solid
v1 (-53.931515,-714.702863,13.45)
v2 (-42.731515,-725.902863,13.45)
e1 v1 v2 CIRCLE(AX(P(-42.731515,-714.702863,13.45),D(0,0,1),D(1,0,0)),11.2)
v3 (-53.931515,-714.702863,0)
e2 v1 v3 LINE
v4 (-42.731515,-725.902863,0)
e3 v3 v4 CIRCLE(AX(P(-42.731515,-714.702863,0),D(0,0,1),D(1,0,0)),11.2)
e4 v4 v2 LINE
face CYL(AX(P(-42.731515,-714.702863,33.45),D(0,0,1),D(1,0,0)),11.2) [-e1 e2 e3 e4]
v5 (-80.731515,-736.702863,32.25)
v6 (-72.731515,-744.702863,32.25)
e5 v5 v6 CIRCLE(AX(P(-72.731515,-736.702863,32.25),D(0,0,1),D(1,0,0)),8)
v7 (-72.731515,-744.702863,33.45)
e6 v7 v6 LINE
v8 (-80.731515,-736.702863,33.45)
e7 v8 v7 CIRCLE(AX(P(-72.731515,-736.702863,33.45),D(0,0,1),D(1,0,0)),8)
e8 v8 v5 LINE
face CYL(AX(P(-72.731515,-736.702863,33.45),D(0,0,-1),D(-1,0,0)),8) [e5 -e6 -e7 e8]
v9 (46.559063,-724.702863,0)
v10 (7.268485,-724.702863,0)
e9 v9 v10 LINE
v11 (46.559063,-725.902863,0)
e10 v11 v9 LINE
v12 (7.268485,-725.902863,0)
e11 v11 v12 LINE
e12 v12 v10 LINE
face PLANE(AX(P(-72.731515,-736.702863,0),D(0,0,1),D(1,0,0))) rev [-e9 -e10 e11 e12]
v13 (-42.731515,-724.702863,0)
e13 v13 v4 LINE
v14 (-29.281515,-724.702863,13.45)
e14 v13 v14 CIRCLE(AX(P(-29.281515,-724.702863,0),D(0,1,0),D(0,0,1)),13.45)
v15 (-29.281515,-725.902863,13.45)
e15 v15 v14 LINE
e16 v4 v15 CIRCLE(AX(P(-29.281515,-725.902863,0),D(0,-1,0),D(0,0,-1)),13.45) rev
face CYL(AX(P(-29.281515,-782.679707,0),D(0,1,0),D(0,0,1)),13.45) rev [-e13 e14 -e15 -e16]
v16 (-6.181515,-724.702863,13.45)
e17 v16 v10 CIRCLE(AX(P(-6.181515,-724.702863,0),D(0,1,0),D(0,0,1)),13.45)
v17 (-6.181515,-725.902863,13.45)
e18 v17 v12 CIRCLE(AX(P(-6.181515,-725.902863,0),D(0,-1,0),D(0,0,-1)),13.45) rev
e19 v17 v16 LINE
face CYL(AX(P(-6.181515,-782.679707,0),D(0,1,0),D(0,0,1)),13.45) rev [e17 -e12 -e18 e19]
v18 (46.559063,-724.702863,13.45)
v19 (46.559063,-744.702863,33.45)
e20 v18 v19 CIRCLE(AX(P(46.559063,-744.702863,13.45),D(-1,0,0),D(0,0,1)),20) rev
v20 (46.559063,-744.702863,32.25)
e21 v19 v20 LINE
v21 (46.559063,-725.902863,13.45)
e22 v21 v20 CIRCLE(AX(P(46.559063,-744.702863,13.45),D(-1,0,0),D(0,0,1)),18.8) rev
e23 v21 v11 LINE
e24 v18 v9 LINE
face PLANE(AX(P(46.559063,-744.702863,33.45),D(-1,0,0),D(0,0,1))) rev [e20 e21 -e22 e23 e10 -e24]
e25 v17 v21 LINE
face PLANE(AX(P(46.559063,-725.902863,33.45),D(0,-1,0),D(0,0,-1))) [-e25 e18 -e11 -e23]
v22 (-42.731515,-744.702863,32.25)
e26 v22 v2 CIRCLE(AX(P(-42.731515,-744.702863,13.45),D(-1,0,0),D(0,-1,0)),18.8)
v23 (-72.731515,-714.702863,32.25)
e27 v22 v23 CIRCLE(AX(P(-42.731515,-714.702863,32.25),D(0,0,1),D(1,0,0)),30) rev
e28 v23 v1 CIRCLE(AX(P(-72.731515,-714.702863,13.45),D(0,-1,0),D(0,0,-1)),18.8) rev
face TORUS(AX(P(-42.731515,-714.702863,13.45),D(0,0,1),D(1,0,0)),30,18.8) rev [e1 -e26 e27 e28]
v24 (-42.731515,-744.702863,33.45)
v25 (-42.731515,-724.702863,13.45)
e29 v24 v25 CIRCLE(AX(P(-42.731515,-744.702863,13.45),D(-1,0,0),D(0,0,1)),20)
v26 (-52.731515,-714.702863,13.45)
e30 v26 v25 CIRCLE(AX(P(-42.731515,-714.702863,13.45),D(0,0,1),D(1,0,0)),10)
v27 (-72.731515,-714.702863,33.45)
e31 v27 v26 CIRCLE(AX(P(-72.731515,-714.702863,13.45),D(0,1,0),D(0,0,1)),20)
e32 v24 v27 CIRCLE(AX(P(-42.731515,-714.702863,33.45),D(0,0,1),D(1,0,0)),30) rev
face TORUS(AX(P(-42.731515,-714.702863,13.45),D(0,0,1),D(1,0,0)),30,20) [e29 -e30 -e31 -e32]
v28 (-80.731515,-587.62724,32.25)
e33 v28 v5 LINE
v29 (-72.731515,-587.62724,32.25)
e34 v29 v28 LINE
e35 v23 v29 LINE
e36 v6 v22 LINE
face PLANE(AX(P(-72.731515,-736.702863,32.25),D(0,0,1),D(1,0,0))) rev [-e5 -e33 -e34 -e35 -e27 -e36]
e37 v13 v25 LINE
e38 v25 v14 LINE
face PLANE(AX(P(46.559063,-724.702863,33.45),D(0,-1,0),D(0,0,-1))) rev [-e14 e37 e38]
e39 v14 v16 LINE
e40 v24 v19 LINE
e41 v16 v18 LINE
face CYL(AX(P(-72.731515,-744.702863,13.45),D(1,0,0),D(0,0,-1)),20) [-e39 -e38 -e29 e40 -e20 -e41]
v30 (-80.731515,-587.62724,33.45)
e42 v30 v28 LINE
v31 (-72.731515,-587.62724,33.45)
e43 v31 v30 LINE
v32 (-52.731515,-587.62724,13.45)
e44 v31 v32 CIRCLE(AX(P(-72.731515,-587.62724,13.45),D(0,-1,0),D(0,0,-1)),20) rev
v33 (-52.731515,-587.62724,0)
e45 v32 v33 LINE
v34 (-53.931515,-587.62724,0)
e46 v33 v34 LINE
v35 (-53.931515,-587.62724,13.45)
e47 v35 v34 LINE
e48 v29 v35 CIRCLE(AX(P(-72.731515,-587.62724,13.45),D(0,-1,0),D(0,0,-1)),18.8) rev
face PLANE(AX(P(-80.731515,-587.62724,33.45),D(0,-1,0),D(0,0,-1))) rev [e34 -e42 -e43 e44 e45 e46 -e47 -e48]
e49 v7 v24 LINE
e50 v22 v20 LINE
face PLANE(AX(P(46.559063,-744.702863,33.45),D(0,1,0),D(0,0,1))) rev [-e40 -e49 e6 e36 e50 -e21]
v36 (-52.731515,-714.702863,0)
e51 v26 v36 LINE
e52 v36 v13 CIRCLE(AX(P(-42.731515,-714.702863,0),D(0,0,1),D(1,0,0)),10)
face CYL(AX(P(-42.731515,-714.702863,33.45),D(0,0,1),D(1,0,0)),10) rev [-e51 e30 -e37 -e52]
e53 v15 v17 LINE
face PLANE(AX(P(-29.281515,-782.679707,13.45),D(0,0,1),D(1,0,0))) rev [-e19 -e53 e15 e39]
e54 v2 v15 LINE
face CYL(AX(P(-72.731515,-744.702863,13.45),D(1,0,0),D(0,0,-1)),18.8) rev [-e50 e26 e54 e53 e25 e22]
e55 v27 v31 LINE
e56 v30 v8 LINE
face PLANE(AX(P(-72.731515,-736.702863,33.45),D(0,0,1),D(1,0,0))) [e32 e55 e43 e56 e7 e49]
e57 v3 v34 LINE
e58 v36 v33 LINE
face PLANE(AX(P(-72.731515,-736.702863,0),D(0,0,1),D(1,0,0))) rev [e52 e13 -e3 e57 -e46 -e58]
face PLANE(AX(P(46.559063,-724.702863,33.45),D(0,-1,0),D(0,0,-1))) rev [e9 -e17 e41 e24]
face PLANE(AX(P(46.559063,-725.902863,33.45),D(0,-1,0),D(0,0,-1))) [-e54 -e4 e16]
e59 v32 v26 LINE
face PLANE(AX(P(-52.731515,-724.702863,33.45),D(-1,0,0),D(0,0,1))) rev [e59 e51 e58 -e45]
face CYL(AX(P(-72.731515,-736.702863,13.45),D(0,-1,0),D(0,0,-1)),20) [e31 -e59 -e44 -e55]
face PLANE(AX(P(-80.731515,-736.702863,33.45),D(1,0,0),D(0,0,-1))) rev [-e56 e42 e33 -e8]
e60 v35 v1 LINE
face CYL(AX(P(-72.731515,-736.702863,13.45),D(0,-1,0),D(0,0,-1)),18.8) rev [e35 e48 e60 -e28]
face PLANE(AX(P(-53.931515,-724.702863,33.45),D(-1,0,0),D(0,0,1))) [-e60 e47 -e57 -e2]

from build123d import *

# Parameters (mm, degrees)
BOSS_EXTRUDE1_DEPTH = 33.45
FILLET1_R           = 10
FILLET2_R           = 20
SHELL1_START        = -80.731515082
SHELL1_OUTLINE_W    = 157.075623287
SHELL1_OUTLINE_H    = 32.25
SHELL1_DEPTH        = 38
SHELL1_START_2      = -52.731515082
SHELL1_2_DEPTH      = 99.290578512
SHELL1_START_3      = -714.702863061
SHELL1_3_DEPTH      = 127.075623287
SHELL1_4_ANGLE      = 90
CUT_EXTRUDE1_REACH  = 164.561


with BuildPart() as part:
    # Sketch1 → Boss-Extrude1 (new body)
    with BuildSketch(Plane.XY):
        with BuildLine():
            Line((46.55906343, -744.702863061), (-72.731515082, -744.702863061))
            ThreePointArc((-72.731515082, -744.702863061), (-78.388369332, -742.359717311), (-80.731515082, -736.702863061))
            Line((-80.731515082, -736.702863061), (-80.731515082, -587.627239774))
            Line((-80.731515082, -587.627239774), (-52.731515082, -587.627239774))
            Line((-52.731515082, -587.627239774), (-52.731515082, -724.702863061))
            Line((-52.731515082, -724.702863061), (46.55906343, -724.702863061))
            Line((46.55906343, -724.702863061), (46.55906343, -744.702863061))
        make_face()
    extrude(amount=BOSS_EXTRUDE1_DEPTH)

    # Fillet1
    fillet1_edges = [part.edges().sort_by_distance(p)[0] for p in [
        (-52.731515082, -724.702863061, 16.725),
    ]]
    fillet(fillet1_edges, radius=FILLET1_R)

    # Fillet2
    fillet2_edges = [part.edges().sort_by_distance(p)[0] for p in [
        (-52.731515082, -651.165051418, 33.45),
        (-49.802582894, -721.773930873, 33.45),
        (1.913774174, -724.702863061, 33.45),
    ]]
    fillet(fillet2_edges, radius=FILLET2_R - 0.0001)  # a hair under: the kernel refuses the full size

    # Shell1: read off the stored shape, not the designer's step
    # Shell1 outline → Shell1 (cut)
    with BuildSketch(Plane.YZ.offset(SHELL1_START)):
        with Locations((-666.165051418, 16.125)):
            Rectangle(SHELL1_OUTLINE_W, SHELL1_OUTLINE_H)
    extrude(amount=SHELL1_DEPTH, mode=Mode.SUBTRACT)

    # Shell1 2 outline → Shell1 2 (cut)
    with BuildSketch(Plane.YZ.offset(SHELL1_START_2)):
        with BuildLine():
            Line((-725.902863061, 0), (-725.902863061, 13.45))
            ThreePointArc((-725.902863061, 13.45), (-731.409255575, 26.743607486), (-744.702863061, 32.25))
            Line((-744.702863061, 32.25), (-744.702863061, 0))
            Line((-744.702863061, 0), (-725.902863061, 0))
        make_face()
    extrude(amount=SHELL1_2_DEPTH, mode=Mode.SUBTRACT)

    # Shell1 3 outline → Shell1 3 (add)
    with BuildSketch(Plane(origin=(0, 0, 0), x_dir=(1, 0, 0), z_dir=(0, 1, 0)).offset(SHELL1_START_3)):
        with BuildLine():
            Line((-52.731515082, -13.45), (-52.731515082, 0))
            Line((-52.731515082, 0), (-53.931515082, 0))
            Line((-53.931515082, 0), (-53.931515082, -13.45))
            ThreePointArc((-53.931515082, -13.45), (-59.437907596, -26.743607486), (-72.731515082, -32.25))
            Line((-72.731515082, -32.25), (-65.908026238, -32.25))
            ThreePointArc((-65.908026238, -32.25), (-56.353637062, -24.928898534), (-52.731515082, -13.45))
        make_face()
    extrude(amount=SHELL1_3_DEPTH)

    # Shell1 4 outline → Shell1 4 (revolve)
    with BuildSketch(Plane(origin=(-42.731515082, -714.702863061, 0), x_dir=(-1, 0, 0), z_dir=(0, 1, 0))):
        with BuildLine():
            Line((10, 13.45), (10, 0))
            Line((10, 0), (11.2, 0))
            Line((11.2, 0), (11.2, 13.45))
            ThreePointArc((11.2, 13.45), (16.706392514, 26.743607486), (30, 32.25))
            Line((30, 32.25), (23.176511156, 32.25))
            ThreePointArc((23.176511156, 32.25), (13.62212198, 24.928898534), (10, 13.45))
        make_face()
    revolve(axis=Axis((-42.731515082, -714.702863061, 0), (0, 0, 1)), revolution_arc=SHELL1_4_ANGLE)

    # Cut-Extrude1: up to this face of the body (flat: up to its plane)
    cut_extrude1_end = Plane(part.part.faces().sort_by_distance((1.913774174, -725.902863061, 6.725))[0])
    # Sketch3 → Cut-Extrude1 (cut, up to the picked face)
    with BuildSketch(Plane(origin=(0, -724.702863061, 0), x_dir=(1, 0, 0), z_dir=(0, 1, 0)), mode=Mode.PRIVATE) as cut_extrude1_sk1:
        with BuildLine():
            Line((-29.281515082, 13.45), (-6.181515082, 13.45))
            ThreePointArc((-6.181515082, 13.45), (7.268484918, 0), (-6.181515082, -13.45))
            Line((-6.181515082, -13.45), (-29.281515082, -13.45))
            ThreePointArc((-29.281515082, -13.45), (-42.731515082, 0), (-29.281515082, 13.45))
        make_face()
    cut_extrude1_tool1 = split(extrude(cut_extrude1_sk1.sketch, amount=-CUT_EXTRUDE1_REACH, mode=Mode.PRIVATE), bisect_by=cut_extrude1_end, keep=Keep.BOTH, mode=Mode.PRIVATE)
    add(cut_extrude1_tool1.solids().sort_by(Axis((-17.731515, -724.702863, 0), (0, -1, 0)))[0], mode=Mode.SUBTRACT)


solid = part.part
